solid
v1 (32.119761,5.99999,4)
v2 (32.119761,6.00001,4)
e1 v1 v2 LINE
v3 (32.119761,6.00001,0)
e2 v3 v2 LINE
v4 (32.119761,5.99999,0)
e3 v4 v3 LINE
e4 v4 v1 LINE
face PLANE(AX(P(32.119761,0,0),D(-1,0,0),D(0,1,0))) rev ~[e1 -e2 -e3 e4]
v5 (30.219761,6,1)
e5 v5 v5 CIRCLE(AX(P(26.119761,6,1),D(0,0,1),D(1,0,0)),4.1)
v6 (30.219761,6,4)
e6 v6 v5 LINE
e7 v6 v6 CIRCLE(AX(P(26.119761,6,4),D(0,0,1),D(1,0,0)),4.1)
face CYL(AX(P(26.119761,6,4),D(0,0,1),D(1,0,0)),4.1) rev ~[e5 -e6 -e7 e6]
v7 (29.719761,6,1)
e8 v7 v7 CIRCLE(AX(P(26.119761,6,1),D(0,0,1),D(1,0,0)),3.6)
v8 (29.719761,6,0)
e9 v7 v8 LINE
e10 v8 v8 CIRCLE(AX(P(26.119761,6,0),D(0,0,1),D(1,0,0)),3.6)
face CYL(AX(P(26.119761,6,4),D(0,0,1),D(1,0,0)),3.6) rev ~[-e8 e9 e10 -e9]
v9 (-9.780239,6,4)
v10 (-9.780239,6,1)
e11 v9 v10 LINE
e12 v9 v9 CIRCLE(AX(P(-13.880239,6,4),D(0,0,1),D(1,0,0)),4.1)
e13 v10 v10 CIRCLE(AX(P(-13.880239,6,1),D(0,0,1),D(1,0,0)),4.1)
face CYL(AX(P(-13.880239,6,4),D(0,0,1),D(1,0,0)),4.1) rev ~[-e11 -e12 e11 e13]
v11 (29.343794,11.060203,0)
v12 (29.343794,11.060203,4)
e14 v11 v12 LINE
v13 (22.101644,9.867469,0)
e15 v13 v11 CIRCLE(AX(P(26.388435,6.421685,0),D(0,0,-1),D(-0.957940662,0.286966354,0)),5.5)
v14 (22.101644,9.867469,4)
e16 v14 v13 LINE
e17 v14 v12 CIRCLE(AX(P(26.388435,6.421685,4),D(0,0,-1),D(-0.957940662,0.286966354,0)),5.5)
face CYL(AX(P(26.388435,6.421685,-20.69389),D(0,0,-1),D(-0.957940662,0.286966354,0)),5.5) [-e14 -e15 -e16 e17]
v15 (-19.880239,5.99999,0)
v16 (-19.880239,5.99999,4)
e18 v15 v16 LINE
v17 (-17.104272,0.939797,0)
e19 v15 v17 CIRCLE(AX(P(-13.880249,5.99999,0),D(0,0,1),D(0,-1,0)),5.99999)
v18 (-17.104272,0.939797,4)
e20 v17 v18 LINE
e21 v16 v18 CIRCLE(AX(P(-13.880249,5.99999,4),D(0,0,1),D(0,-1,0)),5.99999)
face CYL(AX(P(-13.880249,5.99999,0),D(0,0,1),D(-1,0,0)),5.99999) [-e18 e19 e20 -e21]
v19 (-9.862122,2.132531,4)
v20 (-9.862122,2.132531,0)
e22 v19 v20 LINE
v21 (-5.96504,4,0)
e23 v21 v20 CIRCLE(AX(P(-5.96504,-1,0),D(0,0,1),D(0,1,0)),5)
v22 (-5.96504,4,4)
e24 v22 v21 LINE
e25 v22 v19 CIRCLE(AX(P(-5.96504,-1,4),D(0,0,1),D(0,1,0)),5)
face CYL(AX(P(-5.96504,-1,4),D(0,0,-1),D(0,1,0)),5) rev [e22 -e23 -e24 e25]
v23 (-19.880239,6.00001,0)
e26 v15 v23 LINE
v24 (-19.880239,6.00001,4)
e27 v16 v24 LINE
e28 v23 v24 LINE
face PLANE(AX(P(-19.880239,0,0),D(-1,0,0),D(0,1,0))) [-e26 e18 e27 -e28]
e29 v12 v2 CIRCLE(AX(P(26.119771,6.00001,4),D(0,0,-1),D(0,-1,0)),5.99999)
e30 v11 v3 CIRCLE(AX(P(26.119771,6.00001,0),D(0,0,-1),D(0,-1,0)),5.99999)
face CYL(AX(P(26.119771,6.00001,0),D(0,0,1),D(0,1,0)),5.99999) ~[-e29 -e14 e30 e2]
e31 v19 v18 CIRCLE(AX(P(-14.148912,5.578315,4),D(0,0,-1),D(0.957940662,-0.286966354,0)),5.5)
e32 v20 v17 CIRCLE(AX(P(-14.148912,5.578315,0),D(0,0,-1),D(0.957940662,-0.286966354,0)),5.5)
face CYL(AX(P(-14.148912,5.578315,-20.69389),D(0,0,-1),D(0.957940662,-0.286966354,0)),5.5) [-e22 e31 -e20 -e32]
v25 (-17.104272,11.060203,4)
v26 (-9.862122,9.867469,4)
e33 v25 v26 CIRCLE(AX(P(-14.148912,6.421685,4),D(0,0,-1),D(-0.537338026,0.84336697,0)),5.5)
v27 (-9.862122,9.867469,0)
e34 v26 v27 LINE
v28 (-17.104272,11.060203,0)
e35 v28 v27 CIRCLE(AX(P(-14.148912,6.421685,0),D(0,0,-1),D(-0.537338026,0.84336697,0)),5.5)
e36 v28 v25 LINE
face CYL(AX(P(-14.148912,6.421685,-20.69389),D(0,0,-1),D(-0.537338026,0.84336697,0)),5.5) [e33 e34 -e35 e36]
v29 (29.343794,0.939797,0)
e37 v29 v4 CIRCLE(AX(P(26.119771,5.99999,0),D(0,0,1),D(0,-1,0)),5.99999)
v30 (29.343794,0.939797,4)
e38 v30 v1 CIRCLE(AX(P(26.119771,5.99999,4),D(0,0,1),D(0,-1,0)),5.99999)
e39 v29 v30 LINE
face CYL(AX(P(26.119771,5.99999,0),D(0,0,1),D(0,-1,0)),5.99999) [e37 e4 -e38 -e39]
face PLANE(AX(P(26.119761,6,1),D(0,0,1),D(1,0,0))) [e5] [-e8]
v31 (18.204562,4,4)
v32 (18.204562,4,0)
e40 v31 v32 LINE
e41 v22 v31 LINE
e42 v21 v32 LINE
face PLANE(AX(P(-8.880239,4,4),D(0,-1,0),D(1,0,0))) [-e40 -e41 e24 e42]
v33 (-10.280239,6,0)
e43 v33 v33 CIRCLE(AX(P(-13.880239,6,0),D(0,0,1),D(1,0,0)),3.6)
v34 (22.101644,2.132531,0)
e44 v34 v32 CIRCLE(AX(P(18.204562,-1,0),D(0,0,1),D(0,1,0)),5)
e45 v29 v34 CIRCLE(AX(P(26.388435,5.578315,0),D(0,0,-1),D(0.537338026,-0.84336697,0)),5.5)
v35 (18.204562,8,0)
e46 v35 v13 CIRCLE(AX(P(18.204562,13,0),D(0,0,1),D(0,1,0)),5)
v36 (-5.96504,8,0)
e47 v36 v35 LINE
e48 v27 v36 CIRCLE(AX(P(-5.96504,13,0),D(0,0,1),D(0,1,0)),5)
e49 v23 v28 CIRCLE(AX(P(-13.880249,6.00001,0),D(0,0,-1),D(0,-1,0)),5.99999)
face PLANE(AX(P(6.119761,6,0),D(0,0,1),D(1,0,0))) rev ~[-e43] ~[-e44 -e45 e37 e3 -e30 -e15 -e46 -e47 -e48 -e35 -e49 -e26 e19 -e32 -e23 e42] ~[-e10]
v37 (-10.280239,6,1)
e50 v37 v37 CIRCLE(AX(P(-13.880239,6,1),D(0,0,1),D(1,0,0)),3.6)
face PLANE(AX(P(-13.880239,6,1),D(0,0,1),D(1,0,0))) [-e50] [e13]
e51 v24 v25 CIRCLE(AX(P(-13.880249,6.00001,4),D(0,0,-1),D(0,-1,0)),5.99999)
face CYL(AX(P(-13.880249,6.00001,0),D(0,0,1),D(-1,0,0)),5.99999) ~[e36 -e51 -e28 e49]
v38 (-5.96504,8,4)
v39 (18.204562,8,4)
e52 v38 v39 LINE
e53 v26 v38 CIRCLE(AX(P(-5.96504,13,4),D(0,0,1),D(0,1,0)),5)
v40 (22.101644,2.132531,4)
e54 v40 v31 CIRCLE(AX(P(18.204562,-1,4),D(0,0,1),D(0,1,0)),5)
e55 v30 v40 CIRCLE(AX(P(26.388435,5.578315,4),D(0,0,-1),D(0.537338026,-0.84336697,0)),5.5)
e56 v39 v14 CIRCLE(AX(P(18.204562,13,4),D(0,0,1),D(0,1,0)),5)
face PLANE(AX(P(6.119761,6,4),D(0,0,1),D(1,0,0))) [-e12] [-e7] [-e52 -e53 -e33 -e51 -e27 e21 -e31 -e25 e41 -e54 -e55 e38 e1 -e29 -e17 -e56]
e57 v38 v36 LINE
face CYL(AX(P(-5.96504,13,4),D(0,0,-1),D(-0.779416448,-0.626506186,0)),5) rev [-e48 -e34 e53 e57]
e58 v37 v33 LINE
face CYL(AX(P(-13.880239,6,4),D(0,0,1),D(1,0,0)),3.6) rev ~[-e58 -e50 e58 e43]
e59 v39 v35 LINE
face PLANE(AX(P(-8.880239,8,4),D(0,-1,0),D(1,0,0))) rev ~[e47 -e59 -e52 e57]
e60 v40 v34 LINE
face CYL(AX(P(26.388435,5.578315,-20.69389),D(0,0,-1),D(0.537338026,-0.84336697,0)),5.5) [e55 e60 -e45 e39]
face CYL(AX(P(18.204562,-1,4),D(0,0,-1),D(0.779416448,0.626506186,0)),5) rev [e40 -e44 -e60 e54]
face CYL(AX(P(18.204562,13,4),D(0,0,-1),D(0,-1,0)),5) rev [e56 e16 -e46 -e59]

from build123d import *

# Parameters (mm, degrees)
F0_W        = 52
F0_H        = 12
F1_DEPTH    = 4
F2_R        = 4.1
F2_R_2      = 3.6
F3_DEPTH    = 3
F4_DEPTH    = 25
F5_R        = 5.99999
F6_W        = 30
F6_H        = 4
F7_DEPTH    = 25
F8_T1_DEPTH = 45.3877798739
F9_R        = 5


# Not quite as in the source:
# - a fillet or chamfer that OpenCascade refuses, or shapes differently, is made with other operations: its cross-section is extruded or revolved along the edge and cut away or added
# - a fillet or chamfer is up to 0.001 mm smaller than in the source, because OpenCascade refuses the exact size
# - a feature names something its author has since deleted; it is built from what else it names


with BuildPart() as f1:
    # F0 (on Top) → F1 (new body)
    with BuildSketch(Plane.XY):
        with Locations((6.1197612388, 6)):
            Rectangle(F0_W, F0_H)
    extrude(amount=F1_DEPTH)

    # F2 (on face) → F3 (cut)
    with BuildSketch(Plane.XY.offset(4)):
        with Locations((-13.8802387612, 6)):
            Circle(F2_R)
        with Locations((-13.8802387612, 6)):
            Circle(F2_R_2, mode=Mode.SUBTRACT)
        with Locations((26.1197612388, 6)):
            Circle(F2_R)
        with Locations((26.1197612388, 6)):
            Circle(F2_R_2, mode=Mode.SUBTRACT)
    extrude(amount=-F3_DEPTH, mode=Mode.SUBTRACT)

    # F2 (on face) → F4 (cut)
    with BuildSketch(Plane.XY.offset(4)):
        with Locations((-13.8802387612, 6)):
            Circle(F2_R_2)
        with Locations((26.1197612388, 6)):
            Circle(F2_R_2)
    extrude(amount=-F4_DEPTH, mode=Mode.SUBTRACT)

    # F5 (radius 6 in the source; OpenCascade refuses exactly that, so slightly less here)
    f5_edges = [f1.edges().sort_by_distance(p)[0] for p in [
        (32.119761, 12, 2),
        (32.119761, 0, 2),
        (-19.880239, 12, 2),
        (-19.880239, 0, 2),
    ]]
    fillet(f5_edges, radius=F5_R)

    # F6 (on face) → F7 (cut)
    with BuildSketch(Plane.XY.offset(4)):
        with Locations((6.1197612388, 10)):
            Rectangle(F6_W, F6_H)
        with Locations((6.1197612388, 2)):
            Rectangle(F6_W, F6_H)
    extrude(amount=-F7_DEPTH, mode=Mode.SUBTRACT)

    # F8: fillet of radius 5.5 on 4 edges, made by hand

    # F8_s2 → F8_t1 (cut)
    with BuildSketch(Plane.XY.offset(-20.693889937)):
        with BuildLine():
            ThreePointArc((-17.1042715454, 11.0602033843), (-12.2308229409, 11.5763851223), (-8.8802387612, 8))
            Line((-8.8802387612, 8), (-8.3533713972, 8.1578314949))
            ThreePointArc((-8.3533713972, 8.1578314949), (-8.3302387612, 10), (-8.3302387612, 12))
            Line((-8.3302387612, 12), (-8.8802387612, 12.55))
            ThreePointArc((-8.8802387612, 12.55), (-13.8802487612, 12.55), (-17.3998074599, 11.5240552176))
            Line((-17.3998074599, 11.5240552176), (-17.1042715454, 11.0602033843))
        make_face()
        with BuildLine():
            ThreePointArc((-8.8802387612, 4), (-12.2308229409, 0.4236148777), (-17.1042715454, 0.9397966157))
            Line((-17.1042715454, 0.9397966157), (-17.3998074599, 0.4759447824))
            ThreePointArc((-17.3998074599, 0.4759447824), (-13.8802487612, -0.55), (-8.8802387612, -0.55))
            Line((-8.8802387612, -0.55), (-8.3302387612, 0))
            ThreePointArc((-8.3302387612, 0), (-8.3302387612, 2), (-8.3533713972, 3.8421685051))
            Line((-8.3533713972, 3.8421685051), (-8.8802387612, 4))
        make_face()
        with BuildLine():
            ThreePointArc((29.3437940231, 0.9397966157), (24.4703454185, 0.4236148777), (21.1197612388, 4))
            Line((21.1197612388, 4), (20.5928938749, 3.8421685051))
            ThreePointArc((20.5928938749, 3.8421685051), (20.5697612388, 2), (20.5697612388, 0))
            Line((20.5697612388, 0), (21.1197612388, -0.55))
            ThreePointArc((21.1197612388, -0.55), (26.1197712388, -0.55), (29.6393299376, 0.4759447824))
            Line((29.6393299376, 0.4759447824), (29.3437940231, 0.9397966157))
        make_face()
        with BuildLine():
            ThreePointArc((21.1197612388, 8), (24.4703454185, 11.5763851223), (29.3437940231, 11.0602033843))
            Line((29.3437940231, 11.0602033843), (29.6393299376, 11.5240552176))
            ThreePointArc((29.6393299376, 11.5240552176), (26.1197712388, 12.55), (21.1197612388, 12.55))
            Line((21.1197612388, 12.55), (20.5697612388, 12))
            ThreePointArc((20.5697612388, 12), (20.5697612388, 10), (20.5928938749, 8.1578314949))
            Line((20.5928938749, 8.1578314949), (21.1197612388, 8))
        make_face()
    extrude(amount=F8_T1_DEPTH, mode=Mode.SUBTRACT)

    # F9
    f9_edges = [f1.edges().sort_by_distance(p)[0] for p in [
        (-8.880239, 8, 2),
        (-8.880239, 4, 2),
        (21.119761, 8, 2),
        (21.119761, 4, 2),
    ]]
    fillet(f9_edges, radius=F9_R)


solid = f1.part
